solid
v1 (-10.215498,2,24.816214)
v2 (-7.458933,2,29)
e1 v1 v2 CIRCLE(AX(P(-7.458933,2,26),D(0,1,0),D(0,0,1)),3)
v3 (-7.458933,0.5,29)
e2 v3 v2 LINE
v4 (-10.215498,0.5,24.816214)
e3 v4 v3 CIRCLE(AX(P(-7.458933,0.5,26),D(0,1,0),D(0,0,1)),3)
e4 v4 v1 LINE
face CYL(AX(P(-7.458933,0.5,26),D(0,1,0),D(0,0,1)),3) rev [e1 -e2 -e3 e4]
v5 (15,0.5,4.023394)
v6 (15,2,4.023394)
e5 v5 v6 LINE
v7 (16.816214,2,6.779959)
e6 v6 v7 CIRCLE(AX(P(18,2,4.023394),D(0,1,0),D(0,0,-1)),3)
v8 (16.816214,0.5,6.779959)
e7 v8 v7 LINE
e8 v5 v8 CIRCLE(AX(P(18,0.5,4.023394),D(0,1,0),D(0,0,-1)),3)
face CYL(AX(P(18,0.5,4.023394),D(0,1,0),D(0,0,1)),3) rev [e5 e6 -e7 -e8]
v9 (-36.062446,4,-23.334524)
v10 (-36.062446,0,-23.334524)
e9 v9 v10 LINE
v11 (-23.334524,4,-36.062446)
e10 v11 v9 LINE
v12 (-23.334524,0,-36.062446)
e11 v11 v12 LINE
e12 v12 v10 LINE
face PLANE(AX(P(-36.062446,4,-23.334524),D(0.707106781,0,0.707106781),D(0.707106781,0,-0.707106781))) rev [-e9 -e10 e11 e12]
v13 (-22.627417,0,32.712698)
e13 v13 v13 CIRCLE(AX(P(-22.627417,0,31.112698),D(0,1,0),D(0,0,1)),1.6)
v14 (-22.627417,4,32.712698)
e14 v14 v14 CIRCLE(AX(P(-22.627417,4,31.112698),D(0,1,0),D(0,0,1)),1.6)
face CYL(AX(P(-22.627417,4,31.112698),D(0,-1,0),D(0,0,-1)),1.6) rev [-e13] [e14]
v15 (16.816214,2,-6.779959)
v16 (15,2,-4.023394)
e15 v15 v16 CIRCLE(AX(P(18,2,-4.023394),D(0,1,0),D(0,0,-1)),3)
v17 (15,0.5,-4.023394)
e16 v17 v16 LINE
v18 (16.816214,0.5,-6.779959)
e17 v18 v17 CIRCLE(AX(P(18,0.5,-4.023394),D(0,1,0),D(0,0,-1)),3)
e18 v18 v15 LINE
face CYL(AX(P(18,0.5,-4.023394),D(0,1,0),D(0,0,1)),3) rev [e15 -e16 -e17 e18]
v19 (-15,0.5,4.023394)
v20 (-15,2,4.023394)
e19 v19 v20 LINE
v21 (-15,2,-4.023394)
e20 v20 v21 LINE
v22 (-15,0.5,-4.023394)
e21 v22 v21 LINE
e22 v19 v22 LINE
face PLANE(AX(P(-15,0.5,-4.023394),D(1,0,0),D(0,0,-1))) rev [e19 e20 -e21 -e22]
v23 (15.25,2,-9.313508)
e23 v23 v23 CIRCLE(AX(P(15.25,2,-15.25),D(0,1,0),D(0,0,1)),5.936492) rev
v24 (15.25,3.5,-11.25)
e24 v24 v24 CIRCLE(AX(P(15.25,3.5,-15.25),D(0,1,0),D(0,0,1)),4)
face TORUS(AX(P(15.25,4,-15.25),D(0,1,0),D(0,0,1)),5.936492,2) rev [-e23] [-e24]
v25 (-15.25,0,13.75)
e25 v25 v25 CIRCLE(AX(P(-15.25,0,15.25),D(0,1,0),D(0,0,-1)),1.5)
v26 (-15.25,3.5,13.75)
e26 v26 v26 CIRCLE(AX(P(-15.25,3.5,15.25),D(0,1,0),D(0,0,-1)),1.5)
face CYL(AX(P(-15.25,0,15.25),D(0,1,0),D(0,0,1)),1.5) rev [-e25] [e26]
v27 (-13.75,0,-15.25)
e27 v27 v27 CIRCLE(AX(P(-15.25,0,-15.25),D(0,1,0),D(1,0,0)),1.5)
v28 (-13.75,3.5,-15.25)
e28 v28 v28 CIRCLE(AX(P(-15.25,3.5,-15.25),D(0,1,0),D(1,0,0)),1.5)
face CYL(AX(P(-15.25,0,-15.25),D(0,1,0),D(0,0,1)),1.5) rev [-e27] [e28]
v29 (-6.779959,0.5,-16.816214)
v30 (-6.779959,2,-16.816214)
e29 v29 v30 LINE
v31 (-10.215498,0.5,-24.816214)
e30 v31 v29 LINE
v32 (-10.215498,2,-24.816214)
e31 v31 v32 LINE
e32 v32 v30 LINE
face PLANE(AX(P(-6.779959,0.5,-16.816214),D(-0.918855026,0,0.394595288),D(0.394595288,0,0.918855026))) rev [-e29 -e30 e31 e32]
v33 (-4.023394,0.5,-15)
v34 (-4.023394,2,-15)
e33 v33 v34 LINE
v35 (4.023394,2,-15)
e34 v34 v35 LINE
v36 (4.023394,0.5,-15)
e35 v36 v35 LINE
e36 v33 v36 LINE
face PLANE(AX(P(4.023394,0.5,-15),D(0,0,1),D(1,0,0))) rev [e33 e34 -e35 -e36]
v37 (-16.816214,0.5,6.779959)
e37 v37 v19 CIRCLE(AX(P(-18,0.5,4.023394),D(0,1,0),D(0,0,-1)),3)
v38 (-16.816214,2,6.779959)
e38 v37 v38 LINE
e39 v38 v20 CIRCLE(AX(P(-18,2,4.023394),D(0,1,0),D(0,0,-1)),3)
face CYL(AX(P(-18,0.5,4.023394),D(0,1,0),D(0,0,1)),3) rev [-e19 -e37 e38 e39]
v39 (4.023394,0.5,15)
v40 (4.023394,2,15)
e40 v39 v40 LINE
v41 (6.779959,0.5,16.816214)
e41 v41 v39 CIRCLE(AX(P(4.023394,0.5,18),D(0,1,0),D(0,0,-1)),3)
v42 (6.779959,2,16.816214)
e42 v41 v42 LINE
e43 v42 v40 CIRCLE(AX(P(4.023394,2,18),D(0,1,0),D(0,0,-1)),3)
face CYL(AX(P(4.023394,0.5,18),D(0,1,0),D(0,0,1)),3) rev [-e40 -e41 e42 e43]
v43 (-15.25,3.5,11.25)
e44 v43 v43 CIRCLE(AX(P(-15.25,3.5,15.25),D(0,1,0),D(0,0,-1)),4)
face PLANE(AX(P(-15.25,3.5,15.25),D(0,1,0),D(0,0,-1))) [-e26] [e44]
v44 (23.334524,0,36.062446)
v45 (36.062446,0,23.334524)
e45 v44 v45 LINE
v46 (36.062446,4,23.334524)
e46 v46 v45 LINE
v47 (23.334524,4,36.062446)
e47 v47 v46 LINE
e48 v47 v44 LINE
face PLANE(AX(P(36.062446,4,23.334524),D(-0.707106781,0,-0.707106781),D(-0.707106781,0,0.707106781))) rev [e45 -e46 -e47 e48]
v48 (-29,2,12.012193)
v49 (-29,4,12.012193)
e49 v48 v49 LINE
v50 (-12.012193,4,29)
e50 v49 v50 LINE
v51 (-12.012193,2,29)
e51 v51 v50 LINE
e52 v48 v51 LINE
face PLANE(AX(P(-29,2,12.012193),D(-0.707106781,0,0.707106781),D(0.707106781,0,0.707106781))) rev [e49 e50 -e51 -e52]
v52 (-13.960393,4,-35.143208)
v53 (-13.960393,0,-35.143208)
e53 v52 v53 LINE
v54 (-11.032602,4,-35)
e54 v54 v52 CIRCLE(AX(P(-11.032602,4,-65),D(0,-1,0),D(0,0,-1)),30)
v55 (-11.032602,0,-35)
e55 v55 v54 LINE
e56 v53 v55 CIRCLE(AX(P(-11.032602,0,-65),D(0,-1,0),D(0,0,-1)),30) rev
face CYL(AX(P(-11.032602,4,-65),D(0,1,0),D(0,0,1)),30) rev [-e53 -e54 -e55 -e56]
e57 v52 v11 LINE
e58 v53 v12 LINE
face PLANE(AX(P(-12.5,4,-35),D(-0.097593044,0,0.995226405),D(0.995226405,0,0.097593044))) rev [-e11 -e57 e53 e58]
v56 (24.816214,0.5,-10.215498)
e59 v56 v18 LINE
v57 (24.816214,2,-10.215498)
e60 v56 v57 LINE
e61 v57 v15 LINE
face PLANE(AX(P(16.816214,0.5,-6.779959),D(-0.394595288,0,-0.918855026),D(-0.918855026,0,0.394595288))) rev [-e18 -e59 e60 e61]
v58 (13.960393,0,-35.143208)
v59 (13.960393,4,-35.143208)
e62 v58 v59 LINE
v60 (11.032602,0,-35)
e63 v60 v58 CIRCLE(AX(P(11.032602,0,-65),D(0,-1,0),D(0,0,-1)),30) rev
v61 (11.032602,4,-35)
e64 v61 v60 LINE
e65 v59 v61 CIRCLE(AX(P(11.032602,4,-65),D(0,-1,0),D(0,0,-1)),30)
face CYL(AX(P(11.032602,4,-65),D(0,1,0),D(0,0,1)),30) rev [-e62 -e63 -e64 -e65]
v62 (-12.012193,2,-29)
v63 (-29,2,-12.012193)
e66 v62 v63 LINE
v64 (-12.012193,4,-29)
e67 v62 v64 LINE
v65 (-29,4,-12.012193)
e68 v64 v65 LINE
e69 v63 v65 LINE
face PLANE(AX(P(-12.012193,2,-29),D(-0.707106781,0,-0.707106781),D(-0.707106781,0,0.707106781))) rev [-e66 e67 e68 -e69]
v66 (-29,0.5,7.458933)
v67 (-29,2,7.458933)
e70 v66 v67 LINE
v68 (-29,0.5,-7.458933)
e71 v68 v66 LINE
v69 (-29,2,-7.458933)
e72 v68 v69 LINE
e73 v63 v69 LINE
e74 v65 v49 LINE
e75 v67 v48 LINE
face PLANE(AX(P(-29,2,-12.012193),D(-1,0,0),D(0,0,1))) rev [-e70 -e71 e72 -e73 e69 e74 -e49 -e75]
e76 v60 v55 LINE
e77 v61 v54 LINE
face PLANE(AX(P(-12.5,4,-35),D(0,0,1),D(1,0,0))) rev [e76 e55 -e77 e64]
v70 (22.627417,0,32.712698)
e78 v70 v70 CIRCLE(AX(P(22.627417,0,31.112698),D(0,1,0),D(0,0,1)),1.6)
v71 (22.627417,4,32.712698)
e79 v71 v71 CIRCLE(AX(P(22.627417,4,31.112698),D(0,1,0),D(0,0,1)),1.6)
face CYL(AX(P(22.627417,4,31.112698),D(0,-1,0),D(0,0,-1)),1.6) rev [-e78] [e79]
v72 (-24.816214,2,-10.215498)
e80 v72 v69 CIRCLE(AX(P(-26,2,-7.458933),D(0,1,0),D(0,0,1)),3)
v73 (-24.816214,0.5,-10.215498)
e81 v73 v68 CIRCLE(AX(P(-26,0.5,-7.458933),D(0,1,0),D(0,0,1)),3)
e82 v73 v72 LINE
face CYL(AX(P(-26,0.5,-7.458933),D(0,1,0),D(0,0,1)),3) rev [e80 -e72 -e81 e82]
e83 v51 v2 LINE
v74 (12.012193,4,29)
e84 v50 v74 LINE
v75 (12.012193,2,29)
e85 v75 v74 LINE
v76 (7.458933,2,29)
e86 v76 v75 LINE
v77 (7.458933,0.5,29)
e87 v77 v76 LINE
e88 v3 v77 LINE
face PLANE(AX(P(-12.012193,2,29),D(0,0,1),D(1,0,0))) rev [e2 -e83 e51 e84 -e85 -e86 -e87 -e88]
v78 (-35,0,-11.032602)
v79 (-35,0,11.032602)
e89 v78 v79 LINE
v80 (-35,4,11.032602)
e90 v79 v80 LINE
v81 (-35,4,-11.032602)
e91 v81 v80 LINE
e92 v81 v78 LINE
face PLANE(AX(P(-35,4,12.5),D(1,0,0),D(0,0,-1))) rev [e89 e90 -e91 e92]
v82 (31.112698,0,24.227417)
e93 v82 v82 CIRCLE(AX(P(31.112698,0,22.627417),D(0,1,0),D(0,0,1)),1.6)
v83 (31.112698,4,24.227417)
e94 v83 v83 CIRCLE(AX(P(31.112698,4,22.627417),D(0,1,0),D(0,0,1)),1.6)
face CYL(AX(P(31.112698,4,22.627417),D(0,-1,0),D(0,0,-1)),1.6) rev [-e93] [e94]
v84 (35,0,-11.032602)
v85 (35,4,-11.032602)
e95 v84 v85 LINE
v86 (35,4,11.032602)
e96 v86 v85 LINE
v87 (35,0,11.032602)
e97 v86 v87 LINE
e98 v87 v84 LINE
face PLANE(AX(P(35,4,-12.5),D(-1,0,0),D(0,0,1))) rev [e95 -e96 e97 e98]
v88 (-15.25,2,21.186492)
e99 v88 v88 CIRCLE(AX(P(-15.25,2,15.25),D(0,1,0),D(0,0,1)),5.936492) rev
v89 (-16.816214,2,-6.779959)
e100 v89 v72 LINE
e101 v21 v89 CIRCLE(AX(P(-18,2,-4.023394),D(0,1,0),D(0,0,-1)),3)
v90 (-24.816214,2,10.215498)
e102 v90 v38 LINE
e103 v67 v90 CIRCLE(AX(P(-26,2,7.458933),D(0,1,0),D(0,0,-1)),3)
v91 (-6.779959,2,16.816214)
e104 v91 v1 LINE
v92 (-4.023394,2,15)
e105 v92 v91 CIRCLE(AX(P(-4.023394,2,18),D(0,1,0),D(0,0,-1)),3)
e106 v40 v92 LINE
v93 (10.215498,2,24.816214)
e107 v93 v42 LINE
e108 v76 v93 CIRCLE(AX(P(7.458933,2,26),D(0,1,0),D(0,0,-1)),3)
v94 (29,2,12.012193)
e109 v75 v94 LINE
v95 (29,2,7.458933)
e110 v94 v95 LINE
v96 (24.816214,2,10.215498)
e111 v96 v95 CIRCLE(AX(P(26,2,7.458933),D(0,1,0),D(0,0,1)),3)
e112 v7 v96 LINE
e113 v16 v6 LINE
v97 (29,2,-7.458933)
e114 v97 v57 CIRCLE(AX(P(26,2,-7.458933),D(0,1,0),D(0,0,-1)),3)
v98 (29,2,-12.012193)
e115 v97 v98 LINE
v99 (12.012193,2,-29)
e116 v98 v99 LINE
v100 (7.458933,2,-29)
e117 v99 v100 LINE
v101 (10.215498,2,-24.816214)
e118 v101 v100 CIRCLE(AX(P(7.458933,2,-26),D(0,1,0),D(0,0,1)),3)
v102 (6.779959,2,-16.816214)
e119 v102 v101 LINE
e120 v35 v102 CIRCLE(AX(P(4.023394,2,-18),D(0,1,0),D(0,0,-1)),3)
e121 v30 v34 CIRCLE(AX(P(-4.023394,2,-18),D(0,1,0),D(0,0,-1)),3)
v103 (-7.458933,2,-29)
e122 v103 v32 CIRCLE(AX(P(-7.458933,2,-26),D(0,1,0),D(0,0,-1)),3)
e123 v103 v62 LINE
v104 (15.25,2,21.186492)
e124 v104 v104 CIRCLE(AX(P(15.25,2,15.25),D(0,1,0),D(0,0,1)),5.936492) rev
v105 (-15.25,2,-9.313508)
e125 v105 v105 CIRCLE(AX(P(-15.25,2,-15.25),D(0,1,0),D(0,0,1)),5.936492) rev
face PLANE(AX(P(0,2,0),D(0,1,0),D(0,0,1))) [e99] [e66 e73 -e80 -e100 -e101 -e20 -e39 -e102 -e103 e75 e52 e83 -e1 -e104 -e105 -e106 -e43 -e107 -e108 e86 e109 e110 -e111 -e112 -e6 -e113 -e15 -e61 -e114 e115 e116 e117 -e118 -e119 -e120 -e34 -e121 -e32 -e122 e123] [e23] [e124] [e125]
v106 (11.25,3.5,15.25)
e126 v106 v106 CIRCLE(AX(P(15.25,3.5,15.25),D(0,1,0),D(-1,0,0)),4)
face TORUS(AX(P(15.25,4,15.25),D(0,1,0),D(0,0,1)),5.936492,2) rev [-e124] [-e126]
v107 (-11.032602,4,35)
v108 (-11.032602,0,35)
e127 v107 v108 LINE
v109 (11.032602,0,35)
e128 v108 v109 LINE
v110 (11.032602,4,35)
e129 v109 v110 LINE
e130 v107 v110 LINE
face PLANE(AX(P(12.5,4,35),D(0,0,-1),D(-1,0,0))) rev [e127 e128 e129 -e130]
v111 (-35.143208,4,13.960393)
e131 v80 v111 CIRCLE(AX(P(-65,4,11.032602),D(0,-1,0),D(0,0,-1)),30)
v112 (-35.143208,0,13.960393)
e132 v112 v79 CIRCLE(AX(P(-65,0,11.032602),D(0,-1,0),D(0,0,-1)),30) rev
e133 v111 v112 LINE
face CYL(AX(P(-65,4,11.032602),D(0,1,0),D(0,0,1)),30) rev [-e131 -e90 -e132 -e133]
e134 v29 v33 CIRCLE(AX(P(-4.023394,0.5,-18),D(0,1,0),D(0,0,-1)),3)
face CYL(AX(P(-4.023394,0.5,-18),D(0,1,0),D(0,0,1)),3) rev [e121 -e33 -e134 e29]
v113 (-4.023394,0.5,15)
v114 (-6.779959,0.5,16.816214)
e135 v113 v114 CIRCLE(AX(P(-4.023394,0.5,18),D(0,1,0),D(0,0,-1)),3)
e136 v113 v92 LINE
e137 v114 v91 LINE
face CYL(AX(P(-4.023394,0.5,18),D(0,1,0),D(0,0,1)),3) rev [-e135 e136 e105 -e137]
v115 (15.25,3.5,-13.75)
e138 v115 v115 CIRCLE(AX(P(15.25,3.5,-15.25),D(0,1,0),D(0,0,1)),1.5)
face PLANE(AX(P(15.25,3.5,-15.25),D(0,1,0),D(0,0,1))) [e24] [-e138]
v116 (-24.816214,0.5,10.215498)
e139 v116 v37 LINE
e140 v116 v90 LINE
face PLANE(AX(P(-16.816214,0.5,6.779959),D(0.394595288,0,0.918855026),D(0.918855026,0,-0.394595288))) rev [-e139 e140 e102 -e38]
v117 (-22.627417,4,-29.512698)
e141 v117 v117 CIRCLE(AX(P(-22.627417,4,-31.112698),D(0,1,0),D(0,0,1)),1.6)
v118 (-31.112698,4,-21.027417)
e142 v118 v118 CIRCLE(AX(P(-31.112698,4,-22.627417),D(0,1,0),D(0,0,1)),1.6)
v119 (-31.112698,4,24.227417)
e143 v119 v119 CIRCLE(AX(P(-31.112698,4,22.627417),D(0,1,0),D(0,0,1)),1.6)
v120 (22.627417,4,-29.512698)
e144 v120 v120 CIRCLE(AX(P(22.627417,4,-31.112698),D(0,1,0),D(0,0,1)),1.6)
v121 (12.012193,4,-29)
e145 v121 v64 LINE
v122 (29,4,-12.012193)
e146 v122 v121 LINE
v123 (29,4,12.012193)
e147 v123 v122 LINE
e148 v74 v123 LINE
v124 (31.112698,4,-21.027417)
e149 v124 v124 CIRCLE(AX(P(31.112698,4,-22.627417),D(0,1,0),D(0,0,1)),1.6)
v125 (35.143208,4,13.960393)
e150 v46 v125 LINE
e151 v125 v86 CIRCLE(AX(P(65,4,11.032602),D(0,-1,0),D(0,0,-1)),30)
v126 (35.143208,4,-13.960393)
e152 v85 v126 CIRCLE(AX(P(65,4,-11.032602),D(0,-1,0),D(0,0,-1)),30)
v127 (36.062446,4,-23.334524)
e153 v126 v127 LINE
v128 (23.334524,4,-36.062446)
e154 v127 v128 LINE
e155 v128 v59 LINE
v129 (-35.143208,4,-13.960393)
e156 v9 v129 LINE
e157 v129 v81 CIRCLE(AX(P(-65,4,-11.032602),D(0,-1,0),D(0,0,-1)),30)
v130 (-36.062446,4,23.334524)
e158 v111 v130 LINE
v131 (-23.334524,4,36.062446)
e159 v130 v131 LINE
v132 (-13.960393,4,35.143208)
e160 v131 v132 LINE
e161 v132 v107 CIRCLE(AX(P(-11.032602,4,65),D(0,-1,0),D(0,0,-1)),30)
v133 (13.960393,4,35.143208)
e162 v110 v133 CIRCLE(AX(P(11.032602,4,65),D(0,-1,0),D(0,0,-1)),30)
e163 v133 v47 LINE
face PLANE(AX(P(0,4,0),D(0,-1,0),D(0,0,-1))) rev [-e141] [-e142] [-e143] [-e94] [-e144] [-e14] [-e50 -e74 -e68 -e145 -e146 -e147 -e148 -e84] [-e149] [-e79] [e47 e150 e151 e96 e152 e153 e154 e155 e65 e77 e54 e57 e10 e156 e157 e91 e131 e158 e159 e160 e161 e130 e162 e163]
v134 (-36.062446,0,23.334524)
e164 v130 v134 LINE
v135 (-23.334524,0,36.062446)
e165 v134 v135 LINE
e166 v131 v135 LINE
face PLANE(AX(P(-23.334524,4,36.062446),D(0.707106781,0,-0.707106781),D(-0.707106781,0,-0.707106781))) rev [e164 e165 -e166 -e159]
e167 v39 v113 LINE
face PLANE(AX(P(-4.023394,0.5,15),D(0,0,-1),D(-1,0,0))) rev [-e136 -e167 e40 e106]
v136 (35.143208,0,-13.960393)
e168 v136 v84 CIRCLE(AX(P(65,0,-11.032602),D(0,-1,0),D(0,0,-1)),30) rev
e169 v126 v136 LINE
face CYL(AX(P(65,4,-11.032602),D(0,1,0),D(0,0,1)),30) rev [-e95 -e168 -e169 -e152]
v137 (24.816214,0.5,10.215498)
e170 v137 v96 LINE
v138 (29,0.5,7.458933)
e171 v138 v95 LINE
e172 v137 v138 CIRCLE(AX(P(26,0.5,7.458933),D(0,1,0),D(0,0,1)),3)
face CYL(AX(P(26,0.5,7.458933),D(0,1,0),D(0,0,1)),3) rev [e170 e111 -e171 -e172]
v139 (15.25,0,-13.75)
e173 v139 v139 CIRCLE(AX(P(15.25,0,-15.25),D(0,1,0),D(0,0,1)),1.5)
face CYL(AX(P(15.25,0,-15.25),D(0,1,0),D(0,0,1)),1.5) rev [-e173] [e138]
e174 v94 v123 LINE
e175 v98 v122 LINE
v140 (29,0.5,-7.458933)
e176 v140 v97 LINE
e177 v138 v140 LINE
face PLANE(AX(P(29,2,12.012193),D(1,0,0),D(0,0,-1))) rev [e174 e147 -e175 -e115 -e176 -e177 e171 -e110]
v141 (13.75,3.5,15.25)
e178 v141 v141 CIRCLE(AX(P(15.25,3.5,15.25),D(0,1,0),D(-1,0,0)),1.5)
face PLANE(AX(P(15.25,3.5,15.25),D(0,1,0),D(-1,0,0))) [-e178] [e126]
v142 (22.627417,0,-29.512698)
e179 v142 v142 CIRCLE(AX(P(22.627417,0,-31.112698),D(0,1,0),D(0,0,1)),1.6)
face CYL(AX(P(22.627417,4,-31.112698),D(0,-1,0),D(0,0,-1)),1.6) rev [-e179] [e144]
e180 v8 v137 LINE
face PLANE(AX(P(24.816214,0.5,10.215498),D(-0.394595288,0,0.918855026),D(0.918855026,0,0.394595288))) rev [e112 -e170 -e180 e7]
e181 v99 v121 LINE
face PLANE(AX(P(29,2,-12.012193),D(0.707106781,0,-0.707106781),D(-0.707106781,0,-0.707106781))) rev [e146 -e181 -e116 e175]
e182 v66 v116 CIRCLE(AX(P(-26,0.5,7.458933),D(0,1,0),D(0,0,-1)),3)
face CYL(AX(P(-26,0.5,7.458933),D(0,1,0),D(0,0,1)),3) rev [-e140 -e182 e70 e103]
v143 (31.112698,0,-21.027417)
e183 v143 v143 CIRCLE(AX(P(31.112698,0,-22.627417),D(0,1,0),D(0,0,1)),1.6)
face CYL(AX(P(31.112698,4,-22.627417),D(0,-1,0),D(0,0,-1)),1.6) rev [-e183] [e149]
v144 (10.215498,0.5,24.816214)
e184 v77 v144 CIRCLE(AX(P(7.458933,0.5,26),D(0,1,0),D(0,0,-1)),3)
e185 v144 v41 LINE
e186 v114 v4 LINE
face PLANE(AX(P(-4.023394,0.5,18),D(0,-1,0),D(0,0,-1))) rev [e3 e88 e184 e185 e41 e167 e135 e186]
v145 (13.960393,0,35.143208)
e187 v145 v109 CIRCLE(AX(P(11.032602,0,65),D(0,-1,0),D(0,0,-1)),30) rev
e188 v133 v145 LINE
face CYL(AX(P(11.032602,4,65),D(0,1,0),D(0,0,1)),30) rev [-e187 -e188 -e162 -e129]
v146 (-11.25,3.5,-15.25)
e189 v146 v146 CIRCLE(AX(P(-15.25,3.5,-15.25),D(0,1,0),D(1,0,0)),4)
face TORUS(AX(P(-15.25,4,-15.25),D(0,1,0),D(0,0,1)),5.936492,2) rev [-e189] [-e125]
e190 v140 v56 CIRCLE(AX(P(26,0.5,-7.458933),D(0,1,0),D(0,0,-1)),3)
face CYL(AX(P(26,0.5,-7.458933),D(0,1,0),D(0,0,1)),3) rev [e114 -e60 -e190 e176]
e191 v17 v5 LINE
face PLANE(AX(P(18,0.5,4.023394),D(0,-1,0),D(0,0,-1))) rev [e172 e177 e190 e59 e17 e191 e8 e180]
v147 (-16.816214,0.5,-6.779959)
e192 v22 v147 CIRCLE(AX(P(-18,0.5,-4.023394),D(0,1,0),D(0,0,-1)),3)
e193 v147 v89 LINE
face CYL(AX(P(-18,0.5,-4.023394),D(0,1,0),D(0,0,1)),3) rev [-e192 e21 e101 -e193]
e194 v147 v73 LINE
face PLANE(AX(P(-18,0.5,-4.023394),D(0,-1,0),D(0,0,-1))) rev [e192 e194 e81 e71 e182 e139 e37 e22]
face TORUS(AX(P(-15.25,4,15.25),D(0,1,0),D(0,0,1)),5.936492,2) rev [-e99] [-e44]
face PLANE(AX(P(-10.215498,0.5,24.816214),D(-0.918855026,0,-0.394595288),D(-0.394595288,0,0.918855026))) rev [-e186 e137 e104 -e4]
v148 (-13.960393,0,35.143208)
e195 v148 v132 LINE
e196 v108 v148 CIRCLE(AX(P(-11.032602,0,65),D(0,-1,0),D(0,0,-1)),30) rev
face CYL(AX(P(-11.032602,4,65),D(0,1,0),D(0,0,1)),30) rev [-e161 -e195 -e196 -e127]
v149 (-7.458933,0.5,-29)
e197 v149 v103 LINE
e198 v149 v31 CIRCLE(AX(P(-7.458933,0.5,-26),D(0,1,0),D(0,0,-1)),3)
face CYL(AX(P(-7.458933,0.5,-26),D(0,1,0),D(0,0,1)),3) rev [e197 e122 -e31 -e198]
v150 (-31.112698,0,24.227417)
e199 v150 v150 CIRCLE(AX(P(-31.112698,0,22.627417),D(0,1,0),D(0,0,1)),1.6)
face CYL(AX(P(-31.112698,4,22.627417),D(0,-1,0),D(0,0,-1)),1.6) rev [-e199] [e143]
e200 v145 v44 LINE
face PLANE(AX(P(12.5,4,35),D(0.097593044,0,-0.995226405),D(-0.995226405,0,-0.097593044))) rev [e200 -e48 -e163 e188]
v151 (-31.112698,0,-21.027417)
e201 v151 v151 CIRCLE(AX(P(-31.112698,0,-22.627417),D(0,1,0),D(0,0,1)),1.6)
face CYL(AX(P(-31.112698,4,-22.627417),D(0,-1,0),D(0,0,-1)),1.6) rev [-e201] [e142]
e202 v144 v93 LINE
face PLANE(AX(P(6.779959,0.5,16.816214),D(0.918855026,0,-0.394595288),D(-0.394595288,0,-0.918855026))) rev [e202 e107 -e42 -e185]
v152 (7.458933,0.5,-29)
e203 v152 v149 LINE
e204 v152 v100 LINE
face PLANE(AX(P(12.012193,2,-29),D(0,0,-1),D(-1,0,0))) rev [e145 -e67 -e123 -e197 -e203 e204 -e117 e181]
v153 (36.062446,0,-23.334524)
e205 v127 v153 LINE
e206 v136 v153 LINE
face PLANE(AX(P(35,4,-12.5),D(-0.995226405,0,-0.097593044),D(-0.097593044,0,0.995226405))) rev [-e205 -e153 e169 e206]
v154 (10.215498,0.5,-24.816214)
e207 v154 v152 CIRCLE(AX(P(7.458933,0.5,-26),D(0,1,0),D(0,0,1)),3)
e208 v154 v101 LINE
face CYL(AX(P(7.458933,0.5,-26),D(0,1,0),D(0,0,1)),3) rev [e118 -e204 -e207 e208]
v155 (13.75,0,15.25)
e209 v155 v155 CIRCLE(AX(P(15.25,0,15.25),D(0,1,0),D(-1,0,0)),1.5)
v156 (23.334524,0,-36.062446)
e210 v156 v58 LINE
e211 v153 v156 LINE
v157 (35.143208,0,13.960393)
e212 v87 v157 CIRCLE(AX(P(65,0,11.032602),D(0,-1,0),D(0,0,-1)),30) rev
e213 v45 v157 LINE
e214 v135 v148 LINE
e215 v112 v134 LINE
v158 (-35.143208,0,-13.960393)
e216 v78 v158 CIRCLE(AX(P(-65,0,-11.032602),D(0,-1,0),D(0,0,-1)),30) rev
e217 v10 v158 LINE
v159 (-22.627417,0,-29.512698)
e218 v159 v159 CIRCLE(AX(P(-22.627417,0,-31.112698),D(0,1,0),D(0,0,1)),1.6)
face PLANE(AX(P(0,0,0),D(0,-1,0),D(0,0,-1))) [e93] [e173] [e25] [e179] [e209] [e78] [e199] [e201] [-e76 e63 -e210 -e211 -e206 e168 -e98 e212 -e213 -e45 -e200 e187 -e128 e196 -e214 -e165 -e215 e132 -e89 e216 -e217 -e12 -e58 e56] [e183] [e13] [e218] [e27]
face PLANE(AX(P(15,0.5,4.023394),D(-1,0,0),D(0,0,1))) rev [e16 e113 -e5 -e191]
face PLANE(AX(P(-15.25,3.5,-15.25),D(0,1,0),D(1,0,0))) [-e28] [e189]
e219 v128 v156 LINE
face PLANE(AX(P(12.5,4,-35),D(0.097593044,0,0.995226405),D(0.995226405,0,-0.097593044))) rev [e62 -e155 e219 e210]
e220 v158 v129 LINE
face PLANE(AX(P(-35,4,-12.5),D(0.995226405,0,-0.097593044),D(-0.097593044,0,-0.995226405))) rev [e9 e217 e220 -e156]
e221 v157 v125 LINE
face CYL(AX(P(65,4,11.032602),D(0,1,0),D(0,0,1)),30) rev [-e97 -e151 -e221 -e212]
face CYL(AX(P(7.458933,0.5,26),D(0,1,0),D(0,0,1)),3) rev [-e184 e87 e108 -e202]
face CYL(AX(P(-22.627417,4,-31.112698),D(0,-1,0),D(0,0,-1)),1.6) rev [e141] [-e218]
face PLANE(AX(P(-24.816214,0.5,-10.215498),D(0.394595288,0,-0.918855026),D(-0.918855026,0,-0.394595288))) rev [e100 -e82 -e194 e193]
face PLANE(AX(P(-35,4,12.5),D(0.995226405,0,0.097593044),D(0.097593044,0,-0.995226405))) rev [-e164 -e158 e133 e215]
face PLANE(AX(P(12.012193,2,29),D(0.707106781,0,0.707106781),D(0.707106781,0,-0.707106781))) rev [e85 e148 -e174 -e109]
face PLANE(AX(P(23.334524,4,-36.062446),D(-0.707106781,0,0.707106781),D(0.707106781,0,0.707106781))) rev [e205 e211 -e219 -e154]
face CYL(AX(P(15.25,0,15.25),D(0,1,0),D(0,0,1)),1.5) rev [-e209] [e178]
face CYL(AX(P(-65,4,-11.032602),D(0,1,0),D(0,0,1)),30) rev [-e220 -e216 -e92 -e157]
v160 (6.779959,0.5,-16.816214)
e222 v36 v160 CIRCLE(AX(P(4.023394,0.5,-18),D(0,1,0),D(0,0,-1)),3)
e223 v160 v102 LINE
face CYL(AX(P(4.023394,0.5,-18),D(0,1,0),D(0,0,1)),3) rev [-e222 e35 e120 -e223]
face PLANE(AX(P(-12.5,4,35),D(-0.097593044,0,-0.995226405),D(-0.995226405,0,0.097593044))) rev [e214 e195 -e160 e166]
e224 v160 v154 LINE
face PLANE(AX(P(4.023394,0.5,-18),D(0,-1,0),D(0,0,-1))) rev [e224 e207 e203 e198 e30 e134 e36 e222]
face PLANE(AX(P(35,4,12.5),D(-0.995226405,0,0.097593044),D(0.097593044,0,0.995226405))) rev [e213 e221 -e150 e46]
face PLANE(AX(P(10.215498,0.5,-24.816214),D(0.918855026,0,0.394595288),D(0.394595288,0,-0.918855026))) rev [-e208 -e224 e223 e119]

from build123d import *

# Parameters (mm, degrees)
SKETCH2_R           = 1.6
BOSS_EXTRUDE1_DEPTH = 4
CUT_EXTRUDE1_DEPTH  = 2
CUT_EXTRUDE2_DEPTH  = 1.5
SKETCH6_R           = 1.5
CUT_EXTRUDE3_DEPTH  = 52.039200621
BOSS_EXTRUDE4_START = 1.5
SKETCH7_R           = 4
SKETCH7_R_2         = 1.5
BOSS_EXTRUDE4_DEPTH = 1.5
CIRPATTERN1_COUNT   = 4
FILLET2_R           = 2
FILLET4_R           = 30


with BuildPart() as part:
    # Sketch2 → Boss-Extrude1 (new body)
    with BuildSketch(Plane(origin=(0, 0, 0), x_dir=(1, 0, 0), z_dir=(0, 1, 0))):
        Polygon((-12.5, 35), (12.5, 35), (23.334523779, 36.062445841), (36.062445841, 23.334523779), (35, 12.5), (35, -12.5), (36.062445841, -23.334523779), (23.334523779, -36.062445841), (12.5, -35), (-12.5, -35), (-23.334523779, -36.062445841), (-36.062445841, -23.334523779), (-35, -12.5), (-35, 12.5), (-36.062445841, 23.334523779), (-23.334523779, 36.062445841), align=None)
        with Locations(Location((22.627416998, 31.112698372, 0), (0, 0, 270))):
            Circle(SKETCH2_R, mode=Mode.SUBTRACT)
        with Locations(Location((31.112698372, 22.627416998, 0), (0, 0, 270))):
            Circle(SKETCH2_R, mode=Mode.SUBTRACT)
        with Locations(Location((22.627416998, -31.112698372, 0), (0, 0, 270))):
            Circle(SKETCH2_R, mode=Mode.SUBTRACT)
        with Locations(Location((31.112698372, -22.627416998, 0), (0, 0, 270))):
            Circle(SKETCH2_R, mode=Mode.SUBTRACT)
        with Locations(Location((-31.112698372, -22.627416998, 0), (0, 0, 270))):
            Circle(SKETCH2_R, mode=Mode.SUBTRACT)
        with Locations(Location((-22.627416998, -31.112698372, 0), (0, 0, 270))):
            Circle(SKETCH2_R, mode=Mode.SUBTRACT)
        with Locations(Location((-22.627416998, 31.112698372, 0), (0, 0, 270))):
            Circle(SKETCH2_R, mode=Mode.SUBTRACT)
        with Locations(Location((-31.112698372, 22.627416998, 0), (0, 0, 270))):
            Circle(SKETCH2_R, mode=Mode.SUBTRACT)
    extrude(amount=BOSS_EXTRUDE1_DEPTH)

    # Sketch4 → Cut-Extrude1 (cut)
    with BuildSketch(Plane(origin=(0, 4, 0), x_dir=(1, 0, 0), z_dir=(0, 1, 0))):
        Polygon((29, 12.012193309), (12.012193309, 29), (-12.012193309, 29), (-29, 12.012193309), (-29, -12.012193309), (-12.012193309, -29), (12.012193309, -29), (29, -12.012193309), align=None)
    extrude(amount=-CUT_EXTRUDE1_DEPTH, mode=Mode.SUBTRACT)

    # Sketch5 → Cut-Extrude2 (cut)
    with BuildSketch(Plane(origin=(0, 2, 0), x_dir=(1, 0, 0), z_dir=(0, 1, 0))):
        with BuildLine():
            Line((-24.816214135, 10.215498353), (-16.816214135, 6.779959319))
            ThreePointArc((-16.816214135, 6.779959319), (-15.494869505, 5.673946029), (-15, 4.023394242))
            Line((-15, 4.023394242), (-15, -4.023394242))
            ThreePointArc((-15, -4.023394242), (-15.494869505, -5.673946029), (-16.816214135, -6.779959319))
            Line((-16.816214135, -6.779959319), (-24.816214135, -10.215498353))
            ThreePointArc((-24.816214135, -10.215498353), (-27.650551787, -9.964063771), (-29, -7.458933276))
            Line((-29, -7.458933276), (-29, 7.458933276))
            ThreePointArc((-29, 7.458933276), (-27.650551787, 9.964063771), (-24.816214135, 10.215498353))
        make_face()
        with BuildLine():
            Line((10.215498353, 24.816214135), (6.779959319, 16.816214135))
            ThreePointArc((6.779959319, 16.816214135), (5.673946029, 15.494869505), (4.023394242, 15))
            Line((4.023394242, 15), (-4.023394242, 15))
            ThreePointArc((-4.023394242, 15), (-5.673946029, 15.494869505), (-6.779959319, 16.816214135))
            Line((-6.779959319, 16.816214135), (-10.215498353, 24.816214135))
            ThreePointArc((-10.215498353, 24.816214135), (-9.964063771, 27.650551787), (-7.458933276, 29))
            Line((-7.458933276, 29), (7.458933276, 29))
            ThreePointArc((7.458933276, 29), (9.964063771, 27.650551787), (10.215498353, 24.816214135))
        make_face()
        with BuildLine():
            Line((24.816214135, -10.215498353), (16.816214135, -6.779959319))
            ThreePointArc((16.816214135, -6.779959319), (15.494869505, -5.673946029), (15, -4.023394242))
            Line((15, -4.023394242), (15, 4.023394242))
            ThreePointArc((15, 4.023394242), (15.494869505, 5.673946029), (16.816214135, 6.779959319))
            Line((16.816214135, 6.779959319), (24.816214135, 10.215498353))
            ThreePointArc((24.816214135, 10.215498353), (27.650551787, 9.964063771), (29, 7.458933276))
            Line((29, 7.458933276), (29, -7.458933276))
            ThreePointArc((29, -7.458933276), (27.650551787, -9.964063771), (24.816214135, -10.215498353))
        make_face()
        with BuildLine():
            Line((-10.215498353, -24.816214135), (-6.779959319, -16.816214135))
            ThreePointArc((-6.779959319, -16.816214135), (-5.673946029, -15.494869505), (-4.023394242, -15))
            Line((-4.023394242, -15), (4.023394242, -15))
            ThreePointArc((4.023394242, -15), (5.673946029, -15.494869505), (6.779959319, -16.816214135))
            Line((6.779959319, -16.816214135), (10.215498353, -24.816214135))
            ThreePointArc((10.215498353, -24.816214135), (9.964063771, -27.650551787), (7.458933276, -29))
            Line((7.458933276, -29), (-7.458933276, -29))
            ThreePointArc((-7.458933276, -29), (-9.964063771, -27.650551787), (-10.215498353, -24.816214135))
        make_face()
    extrude(amount=-CUT_EXTRUDE2_DEPTH, mode=Mode.SUBTRACT)

    # Sketch6 → Cut-Extrude3 (cut, through all)
    with BuildSketch(Plane(origin=(0, 2, 0), x_dir=(1, 0, 0), z_dir=(0, 1, 0))):
        with Locations(Location((15.25, 15.25, 0), (0, 0, 270))):
            Circle(SKETCH6_R)
    cut_extrude3 = extrude(amount=-CUT_EXTRUDE3_DEPTH, mode=Mode.SUBTRACT)

    # Sketch7 → Boss-Extrude4 (add)
    with BuildSketch(Plane(origin=(0, 2, 0), x_dir=(1, 0, 0), z_dir=(0, 1, 0)).offset(BOSS_EXTRUDE4_START)):
        with Locations(Location((15.25, 15.25, 0), (0, 0, 270))):
            Circle(SKETCH7_R)
        with Locations(Location((15.25, 15.25, 0), (0, 0, 270))):
            Circle(SKETCH7_R_2, mode=Mode.SUBTRACT)
    boss_extrude4 = extrude(amount=-BOSS_EXTRUDE4_DEPTH)

    # CirPattern1: Cut-Extrude3, Boss-Extrude4 ×4 about axis
    cirpattern1_axis = Axis((0, 0, 0), (0, 1, 0))
    add([cut_extrude3.rotate(cirpattern1_axis, i * 360 / CIRPATTERN1_COUNT) for i in range(1, CIRPATTERN1_COUNT)], mode=Mode.SUBTRACT)
    add([boss_extrude4.rotate(cirpattern1_axis, i * 360 / CIRPATTERN1_COUNT) for i in range(1, CIRPATTERN1_COUNT)])

    # Fillet2
    # the kernel refuses this fillet: 2 mm, written as the material it adds along each edge
    with BuildSketch(Plane(origin=(15.25, 2, -15.25), x_dir=(0, 0, 1), z_dir=(-1, 0, 0))) as fillet2_piece_1:
        with BuildLine():
            CenterArc((5.936491673, 2), FILLET2_R, 194.477512186, 75.522487814)
            Line((4, 1.5), (3.961270167, 1.49))
            ThreePointArc((3.961270167, 1.49), (3.96, 0.75), (3.96, 0))
            Line((3.96, 0), (4, -0.04))
            Line((4, -0.04), (5.936491673, -0.04))
            Line((5.936491673, -0.04), (5.936491673, 0))
        make_face()
    revolve(axis=Axis((15.25, 2, -15.25), (0, 1, 0)))
    with BuildSketch(Plane(origin=(15.25, 2, 15.25), x_dir=(-1, 0, 0), z_dir=(0, 0, -1))) as fillet2_piece_2:
        with BuildLine():
            CenterArc((5.936491673, 2), FILLET2_R, 194.477512186, 75.522487814)
            Line((4, 1.5), (3.961270167, 1.49))
            ThreePointArc((3.961270167, 1.49), (3.96, 0.75), (3.96, 0))
            Line((3.96, 0), (4, -0.04))
            Line((4, -0.04), (5.936491673, -0.04))
            Line((5.936491673, -0.04), (5.936491673, 0))
        make_face()
    revolve(axis=Axis((15.25, 2, 15.25), (0, 1, 0)))
    with BuildSketch(Plane(origin=(-15.25, 2, 15.25), x_dir=(0, 0, -1), z_dir=(1, 0, 0))) as fillet2_piece_3:
        with BuildLine():
            CenterArc((5.936491673, 2), FILLET2_R, 194.477512186, 75.522487814)
            Line((4, 1.5), (3.961270167, 1.49))
            ThreePointArc((3.961270167, 1.49), (3.96, 0.75), (3.96, 0))
            Line((3.96, 0), (4, -0.04))
            Line((4, -0.04), (5.936491673, -0.04))
            Line((5.936491673, -0.04), (5.936491673, 0))
        make_face()
    revolve(axis=Axis((-15.25, 2, 15.25), (0, 1, 0)))
    with BuildSketch(Plane(origin=(-15.25, 2, -15.25), x_dir=(1, 0, 0), z_dir=(0, 0, 1))) as fillet2_piece_4:
        with BuildLine():
            CenterArc((5.936491673, 2), FILLET2_R, 194.477512186, 75.522487814)
            Line((4, 1.5), (3.961270167, 1.49))
            ThreePointArc((3.961270167, 1.49), (3.96, 0.75), (3.96, 0))
            Line((3.96, 0), (4, -0.04))
            Line((4, -0.04), (5.936491673, -0.04))
            Line((5.936491673, -0.04), (5.936491673, 0))
        make_face()
    revolve(axis=Axis((-15.25, 2, -15.25), (0, 1, 0)))

    # Fillet4
    # the kernel refuses this fillet: 30 mm, written as the material it adds along each edge
    with BuildSketch(Plane(origin=(35, 0, -12.5), x_dir=(0.09759304388629828, 0, -0.9952264052892723), z_dir=(0, 1, 0)), Plane(origin=(35, 0, 12.5), x_dir=(0, 0, -1), z_dir=(0, 1, 0)), Plane(origin=(12.5, 0, 35), x_dir=(0.9952264052892723, 0, 0.09759304388629875), z_dir=(0, 1, 0)), Plane(origin=(12.5, 0, -35), x_dir=(-1, 0, 0), z_dir=(0, 1, 0))) as fillet4_piece_1:
        with BuildLine():
            CenterArc((FILLET4_R * 0.0489132680019, -FILLET4_R), FILLET4_R, 90, 5.600584003)
            Line((-FILLET4_R * 0.0486797758844, -FILLET4_R * 0.00477359471073), (0, 0))
            Line((0, 0), (FILLET4_R * 0.0489132680019, 0))
        make_face()
    extrude(amount=4)
    with BuildSketch(Plane(origin=(-12.5, 0, 35), x_dir=(-0.9952264052892463, 0, 0.09759304388656506), z_dir=(0, 1, 0)), Plane(origin=(-35, 0, 12.5), x_dir=(0, 0, -1), z_dir=(0, 1, 0)), Plane(origin=(-35, 0, -12.5), x_dir=(-0.09759304388656435, 0, -0.9952264052892463), z_dir=(0, 1, 0)), Plane(origin=(-12.5, 0, -35), x_dir=(1, 0, 0), z_dir=(0, 1, 0))) as fillet4_piece_2:
        with BuildLine():
            CenterArc((FILLET4_R * 0.048913268002, FILLET4_R), FILLET4_R, 264.399415997, 5.600584003)
            Line((-FILLET4_R * 0.0486797758846, FILLET4_R * 0.00477359471075), (0, 0))
            Line((0, 0), (FILLET4_R * 0.048913268002, 0))
        make_face()
    extrude(amount=4)


solid = part.part
